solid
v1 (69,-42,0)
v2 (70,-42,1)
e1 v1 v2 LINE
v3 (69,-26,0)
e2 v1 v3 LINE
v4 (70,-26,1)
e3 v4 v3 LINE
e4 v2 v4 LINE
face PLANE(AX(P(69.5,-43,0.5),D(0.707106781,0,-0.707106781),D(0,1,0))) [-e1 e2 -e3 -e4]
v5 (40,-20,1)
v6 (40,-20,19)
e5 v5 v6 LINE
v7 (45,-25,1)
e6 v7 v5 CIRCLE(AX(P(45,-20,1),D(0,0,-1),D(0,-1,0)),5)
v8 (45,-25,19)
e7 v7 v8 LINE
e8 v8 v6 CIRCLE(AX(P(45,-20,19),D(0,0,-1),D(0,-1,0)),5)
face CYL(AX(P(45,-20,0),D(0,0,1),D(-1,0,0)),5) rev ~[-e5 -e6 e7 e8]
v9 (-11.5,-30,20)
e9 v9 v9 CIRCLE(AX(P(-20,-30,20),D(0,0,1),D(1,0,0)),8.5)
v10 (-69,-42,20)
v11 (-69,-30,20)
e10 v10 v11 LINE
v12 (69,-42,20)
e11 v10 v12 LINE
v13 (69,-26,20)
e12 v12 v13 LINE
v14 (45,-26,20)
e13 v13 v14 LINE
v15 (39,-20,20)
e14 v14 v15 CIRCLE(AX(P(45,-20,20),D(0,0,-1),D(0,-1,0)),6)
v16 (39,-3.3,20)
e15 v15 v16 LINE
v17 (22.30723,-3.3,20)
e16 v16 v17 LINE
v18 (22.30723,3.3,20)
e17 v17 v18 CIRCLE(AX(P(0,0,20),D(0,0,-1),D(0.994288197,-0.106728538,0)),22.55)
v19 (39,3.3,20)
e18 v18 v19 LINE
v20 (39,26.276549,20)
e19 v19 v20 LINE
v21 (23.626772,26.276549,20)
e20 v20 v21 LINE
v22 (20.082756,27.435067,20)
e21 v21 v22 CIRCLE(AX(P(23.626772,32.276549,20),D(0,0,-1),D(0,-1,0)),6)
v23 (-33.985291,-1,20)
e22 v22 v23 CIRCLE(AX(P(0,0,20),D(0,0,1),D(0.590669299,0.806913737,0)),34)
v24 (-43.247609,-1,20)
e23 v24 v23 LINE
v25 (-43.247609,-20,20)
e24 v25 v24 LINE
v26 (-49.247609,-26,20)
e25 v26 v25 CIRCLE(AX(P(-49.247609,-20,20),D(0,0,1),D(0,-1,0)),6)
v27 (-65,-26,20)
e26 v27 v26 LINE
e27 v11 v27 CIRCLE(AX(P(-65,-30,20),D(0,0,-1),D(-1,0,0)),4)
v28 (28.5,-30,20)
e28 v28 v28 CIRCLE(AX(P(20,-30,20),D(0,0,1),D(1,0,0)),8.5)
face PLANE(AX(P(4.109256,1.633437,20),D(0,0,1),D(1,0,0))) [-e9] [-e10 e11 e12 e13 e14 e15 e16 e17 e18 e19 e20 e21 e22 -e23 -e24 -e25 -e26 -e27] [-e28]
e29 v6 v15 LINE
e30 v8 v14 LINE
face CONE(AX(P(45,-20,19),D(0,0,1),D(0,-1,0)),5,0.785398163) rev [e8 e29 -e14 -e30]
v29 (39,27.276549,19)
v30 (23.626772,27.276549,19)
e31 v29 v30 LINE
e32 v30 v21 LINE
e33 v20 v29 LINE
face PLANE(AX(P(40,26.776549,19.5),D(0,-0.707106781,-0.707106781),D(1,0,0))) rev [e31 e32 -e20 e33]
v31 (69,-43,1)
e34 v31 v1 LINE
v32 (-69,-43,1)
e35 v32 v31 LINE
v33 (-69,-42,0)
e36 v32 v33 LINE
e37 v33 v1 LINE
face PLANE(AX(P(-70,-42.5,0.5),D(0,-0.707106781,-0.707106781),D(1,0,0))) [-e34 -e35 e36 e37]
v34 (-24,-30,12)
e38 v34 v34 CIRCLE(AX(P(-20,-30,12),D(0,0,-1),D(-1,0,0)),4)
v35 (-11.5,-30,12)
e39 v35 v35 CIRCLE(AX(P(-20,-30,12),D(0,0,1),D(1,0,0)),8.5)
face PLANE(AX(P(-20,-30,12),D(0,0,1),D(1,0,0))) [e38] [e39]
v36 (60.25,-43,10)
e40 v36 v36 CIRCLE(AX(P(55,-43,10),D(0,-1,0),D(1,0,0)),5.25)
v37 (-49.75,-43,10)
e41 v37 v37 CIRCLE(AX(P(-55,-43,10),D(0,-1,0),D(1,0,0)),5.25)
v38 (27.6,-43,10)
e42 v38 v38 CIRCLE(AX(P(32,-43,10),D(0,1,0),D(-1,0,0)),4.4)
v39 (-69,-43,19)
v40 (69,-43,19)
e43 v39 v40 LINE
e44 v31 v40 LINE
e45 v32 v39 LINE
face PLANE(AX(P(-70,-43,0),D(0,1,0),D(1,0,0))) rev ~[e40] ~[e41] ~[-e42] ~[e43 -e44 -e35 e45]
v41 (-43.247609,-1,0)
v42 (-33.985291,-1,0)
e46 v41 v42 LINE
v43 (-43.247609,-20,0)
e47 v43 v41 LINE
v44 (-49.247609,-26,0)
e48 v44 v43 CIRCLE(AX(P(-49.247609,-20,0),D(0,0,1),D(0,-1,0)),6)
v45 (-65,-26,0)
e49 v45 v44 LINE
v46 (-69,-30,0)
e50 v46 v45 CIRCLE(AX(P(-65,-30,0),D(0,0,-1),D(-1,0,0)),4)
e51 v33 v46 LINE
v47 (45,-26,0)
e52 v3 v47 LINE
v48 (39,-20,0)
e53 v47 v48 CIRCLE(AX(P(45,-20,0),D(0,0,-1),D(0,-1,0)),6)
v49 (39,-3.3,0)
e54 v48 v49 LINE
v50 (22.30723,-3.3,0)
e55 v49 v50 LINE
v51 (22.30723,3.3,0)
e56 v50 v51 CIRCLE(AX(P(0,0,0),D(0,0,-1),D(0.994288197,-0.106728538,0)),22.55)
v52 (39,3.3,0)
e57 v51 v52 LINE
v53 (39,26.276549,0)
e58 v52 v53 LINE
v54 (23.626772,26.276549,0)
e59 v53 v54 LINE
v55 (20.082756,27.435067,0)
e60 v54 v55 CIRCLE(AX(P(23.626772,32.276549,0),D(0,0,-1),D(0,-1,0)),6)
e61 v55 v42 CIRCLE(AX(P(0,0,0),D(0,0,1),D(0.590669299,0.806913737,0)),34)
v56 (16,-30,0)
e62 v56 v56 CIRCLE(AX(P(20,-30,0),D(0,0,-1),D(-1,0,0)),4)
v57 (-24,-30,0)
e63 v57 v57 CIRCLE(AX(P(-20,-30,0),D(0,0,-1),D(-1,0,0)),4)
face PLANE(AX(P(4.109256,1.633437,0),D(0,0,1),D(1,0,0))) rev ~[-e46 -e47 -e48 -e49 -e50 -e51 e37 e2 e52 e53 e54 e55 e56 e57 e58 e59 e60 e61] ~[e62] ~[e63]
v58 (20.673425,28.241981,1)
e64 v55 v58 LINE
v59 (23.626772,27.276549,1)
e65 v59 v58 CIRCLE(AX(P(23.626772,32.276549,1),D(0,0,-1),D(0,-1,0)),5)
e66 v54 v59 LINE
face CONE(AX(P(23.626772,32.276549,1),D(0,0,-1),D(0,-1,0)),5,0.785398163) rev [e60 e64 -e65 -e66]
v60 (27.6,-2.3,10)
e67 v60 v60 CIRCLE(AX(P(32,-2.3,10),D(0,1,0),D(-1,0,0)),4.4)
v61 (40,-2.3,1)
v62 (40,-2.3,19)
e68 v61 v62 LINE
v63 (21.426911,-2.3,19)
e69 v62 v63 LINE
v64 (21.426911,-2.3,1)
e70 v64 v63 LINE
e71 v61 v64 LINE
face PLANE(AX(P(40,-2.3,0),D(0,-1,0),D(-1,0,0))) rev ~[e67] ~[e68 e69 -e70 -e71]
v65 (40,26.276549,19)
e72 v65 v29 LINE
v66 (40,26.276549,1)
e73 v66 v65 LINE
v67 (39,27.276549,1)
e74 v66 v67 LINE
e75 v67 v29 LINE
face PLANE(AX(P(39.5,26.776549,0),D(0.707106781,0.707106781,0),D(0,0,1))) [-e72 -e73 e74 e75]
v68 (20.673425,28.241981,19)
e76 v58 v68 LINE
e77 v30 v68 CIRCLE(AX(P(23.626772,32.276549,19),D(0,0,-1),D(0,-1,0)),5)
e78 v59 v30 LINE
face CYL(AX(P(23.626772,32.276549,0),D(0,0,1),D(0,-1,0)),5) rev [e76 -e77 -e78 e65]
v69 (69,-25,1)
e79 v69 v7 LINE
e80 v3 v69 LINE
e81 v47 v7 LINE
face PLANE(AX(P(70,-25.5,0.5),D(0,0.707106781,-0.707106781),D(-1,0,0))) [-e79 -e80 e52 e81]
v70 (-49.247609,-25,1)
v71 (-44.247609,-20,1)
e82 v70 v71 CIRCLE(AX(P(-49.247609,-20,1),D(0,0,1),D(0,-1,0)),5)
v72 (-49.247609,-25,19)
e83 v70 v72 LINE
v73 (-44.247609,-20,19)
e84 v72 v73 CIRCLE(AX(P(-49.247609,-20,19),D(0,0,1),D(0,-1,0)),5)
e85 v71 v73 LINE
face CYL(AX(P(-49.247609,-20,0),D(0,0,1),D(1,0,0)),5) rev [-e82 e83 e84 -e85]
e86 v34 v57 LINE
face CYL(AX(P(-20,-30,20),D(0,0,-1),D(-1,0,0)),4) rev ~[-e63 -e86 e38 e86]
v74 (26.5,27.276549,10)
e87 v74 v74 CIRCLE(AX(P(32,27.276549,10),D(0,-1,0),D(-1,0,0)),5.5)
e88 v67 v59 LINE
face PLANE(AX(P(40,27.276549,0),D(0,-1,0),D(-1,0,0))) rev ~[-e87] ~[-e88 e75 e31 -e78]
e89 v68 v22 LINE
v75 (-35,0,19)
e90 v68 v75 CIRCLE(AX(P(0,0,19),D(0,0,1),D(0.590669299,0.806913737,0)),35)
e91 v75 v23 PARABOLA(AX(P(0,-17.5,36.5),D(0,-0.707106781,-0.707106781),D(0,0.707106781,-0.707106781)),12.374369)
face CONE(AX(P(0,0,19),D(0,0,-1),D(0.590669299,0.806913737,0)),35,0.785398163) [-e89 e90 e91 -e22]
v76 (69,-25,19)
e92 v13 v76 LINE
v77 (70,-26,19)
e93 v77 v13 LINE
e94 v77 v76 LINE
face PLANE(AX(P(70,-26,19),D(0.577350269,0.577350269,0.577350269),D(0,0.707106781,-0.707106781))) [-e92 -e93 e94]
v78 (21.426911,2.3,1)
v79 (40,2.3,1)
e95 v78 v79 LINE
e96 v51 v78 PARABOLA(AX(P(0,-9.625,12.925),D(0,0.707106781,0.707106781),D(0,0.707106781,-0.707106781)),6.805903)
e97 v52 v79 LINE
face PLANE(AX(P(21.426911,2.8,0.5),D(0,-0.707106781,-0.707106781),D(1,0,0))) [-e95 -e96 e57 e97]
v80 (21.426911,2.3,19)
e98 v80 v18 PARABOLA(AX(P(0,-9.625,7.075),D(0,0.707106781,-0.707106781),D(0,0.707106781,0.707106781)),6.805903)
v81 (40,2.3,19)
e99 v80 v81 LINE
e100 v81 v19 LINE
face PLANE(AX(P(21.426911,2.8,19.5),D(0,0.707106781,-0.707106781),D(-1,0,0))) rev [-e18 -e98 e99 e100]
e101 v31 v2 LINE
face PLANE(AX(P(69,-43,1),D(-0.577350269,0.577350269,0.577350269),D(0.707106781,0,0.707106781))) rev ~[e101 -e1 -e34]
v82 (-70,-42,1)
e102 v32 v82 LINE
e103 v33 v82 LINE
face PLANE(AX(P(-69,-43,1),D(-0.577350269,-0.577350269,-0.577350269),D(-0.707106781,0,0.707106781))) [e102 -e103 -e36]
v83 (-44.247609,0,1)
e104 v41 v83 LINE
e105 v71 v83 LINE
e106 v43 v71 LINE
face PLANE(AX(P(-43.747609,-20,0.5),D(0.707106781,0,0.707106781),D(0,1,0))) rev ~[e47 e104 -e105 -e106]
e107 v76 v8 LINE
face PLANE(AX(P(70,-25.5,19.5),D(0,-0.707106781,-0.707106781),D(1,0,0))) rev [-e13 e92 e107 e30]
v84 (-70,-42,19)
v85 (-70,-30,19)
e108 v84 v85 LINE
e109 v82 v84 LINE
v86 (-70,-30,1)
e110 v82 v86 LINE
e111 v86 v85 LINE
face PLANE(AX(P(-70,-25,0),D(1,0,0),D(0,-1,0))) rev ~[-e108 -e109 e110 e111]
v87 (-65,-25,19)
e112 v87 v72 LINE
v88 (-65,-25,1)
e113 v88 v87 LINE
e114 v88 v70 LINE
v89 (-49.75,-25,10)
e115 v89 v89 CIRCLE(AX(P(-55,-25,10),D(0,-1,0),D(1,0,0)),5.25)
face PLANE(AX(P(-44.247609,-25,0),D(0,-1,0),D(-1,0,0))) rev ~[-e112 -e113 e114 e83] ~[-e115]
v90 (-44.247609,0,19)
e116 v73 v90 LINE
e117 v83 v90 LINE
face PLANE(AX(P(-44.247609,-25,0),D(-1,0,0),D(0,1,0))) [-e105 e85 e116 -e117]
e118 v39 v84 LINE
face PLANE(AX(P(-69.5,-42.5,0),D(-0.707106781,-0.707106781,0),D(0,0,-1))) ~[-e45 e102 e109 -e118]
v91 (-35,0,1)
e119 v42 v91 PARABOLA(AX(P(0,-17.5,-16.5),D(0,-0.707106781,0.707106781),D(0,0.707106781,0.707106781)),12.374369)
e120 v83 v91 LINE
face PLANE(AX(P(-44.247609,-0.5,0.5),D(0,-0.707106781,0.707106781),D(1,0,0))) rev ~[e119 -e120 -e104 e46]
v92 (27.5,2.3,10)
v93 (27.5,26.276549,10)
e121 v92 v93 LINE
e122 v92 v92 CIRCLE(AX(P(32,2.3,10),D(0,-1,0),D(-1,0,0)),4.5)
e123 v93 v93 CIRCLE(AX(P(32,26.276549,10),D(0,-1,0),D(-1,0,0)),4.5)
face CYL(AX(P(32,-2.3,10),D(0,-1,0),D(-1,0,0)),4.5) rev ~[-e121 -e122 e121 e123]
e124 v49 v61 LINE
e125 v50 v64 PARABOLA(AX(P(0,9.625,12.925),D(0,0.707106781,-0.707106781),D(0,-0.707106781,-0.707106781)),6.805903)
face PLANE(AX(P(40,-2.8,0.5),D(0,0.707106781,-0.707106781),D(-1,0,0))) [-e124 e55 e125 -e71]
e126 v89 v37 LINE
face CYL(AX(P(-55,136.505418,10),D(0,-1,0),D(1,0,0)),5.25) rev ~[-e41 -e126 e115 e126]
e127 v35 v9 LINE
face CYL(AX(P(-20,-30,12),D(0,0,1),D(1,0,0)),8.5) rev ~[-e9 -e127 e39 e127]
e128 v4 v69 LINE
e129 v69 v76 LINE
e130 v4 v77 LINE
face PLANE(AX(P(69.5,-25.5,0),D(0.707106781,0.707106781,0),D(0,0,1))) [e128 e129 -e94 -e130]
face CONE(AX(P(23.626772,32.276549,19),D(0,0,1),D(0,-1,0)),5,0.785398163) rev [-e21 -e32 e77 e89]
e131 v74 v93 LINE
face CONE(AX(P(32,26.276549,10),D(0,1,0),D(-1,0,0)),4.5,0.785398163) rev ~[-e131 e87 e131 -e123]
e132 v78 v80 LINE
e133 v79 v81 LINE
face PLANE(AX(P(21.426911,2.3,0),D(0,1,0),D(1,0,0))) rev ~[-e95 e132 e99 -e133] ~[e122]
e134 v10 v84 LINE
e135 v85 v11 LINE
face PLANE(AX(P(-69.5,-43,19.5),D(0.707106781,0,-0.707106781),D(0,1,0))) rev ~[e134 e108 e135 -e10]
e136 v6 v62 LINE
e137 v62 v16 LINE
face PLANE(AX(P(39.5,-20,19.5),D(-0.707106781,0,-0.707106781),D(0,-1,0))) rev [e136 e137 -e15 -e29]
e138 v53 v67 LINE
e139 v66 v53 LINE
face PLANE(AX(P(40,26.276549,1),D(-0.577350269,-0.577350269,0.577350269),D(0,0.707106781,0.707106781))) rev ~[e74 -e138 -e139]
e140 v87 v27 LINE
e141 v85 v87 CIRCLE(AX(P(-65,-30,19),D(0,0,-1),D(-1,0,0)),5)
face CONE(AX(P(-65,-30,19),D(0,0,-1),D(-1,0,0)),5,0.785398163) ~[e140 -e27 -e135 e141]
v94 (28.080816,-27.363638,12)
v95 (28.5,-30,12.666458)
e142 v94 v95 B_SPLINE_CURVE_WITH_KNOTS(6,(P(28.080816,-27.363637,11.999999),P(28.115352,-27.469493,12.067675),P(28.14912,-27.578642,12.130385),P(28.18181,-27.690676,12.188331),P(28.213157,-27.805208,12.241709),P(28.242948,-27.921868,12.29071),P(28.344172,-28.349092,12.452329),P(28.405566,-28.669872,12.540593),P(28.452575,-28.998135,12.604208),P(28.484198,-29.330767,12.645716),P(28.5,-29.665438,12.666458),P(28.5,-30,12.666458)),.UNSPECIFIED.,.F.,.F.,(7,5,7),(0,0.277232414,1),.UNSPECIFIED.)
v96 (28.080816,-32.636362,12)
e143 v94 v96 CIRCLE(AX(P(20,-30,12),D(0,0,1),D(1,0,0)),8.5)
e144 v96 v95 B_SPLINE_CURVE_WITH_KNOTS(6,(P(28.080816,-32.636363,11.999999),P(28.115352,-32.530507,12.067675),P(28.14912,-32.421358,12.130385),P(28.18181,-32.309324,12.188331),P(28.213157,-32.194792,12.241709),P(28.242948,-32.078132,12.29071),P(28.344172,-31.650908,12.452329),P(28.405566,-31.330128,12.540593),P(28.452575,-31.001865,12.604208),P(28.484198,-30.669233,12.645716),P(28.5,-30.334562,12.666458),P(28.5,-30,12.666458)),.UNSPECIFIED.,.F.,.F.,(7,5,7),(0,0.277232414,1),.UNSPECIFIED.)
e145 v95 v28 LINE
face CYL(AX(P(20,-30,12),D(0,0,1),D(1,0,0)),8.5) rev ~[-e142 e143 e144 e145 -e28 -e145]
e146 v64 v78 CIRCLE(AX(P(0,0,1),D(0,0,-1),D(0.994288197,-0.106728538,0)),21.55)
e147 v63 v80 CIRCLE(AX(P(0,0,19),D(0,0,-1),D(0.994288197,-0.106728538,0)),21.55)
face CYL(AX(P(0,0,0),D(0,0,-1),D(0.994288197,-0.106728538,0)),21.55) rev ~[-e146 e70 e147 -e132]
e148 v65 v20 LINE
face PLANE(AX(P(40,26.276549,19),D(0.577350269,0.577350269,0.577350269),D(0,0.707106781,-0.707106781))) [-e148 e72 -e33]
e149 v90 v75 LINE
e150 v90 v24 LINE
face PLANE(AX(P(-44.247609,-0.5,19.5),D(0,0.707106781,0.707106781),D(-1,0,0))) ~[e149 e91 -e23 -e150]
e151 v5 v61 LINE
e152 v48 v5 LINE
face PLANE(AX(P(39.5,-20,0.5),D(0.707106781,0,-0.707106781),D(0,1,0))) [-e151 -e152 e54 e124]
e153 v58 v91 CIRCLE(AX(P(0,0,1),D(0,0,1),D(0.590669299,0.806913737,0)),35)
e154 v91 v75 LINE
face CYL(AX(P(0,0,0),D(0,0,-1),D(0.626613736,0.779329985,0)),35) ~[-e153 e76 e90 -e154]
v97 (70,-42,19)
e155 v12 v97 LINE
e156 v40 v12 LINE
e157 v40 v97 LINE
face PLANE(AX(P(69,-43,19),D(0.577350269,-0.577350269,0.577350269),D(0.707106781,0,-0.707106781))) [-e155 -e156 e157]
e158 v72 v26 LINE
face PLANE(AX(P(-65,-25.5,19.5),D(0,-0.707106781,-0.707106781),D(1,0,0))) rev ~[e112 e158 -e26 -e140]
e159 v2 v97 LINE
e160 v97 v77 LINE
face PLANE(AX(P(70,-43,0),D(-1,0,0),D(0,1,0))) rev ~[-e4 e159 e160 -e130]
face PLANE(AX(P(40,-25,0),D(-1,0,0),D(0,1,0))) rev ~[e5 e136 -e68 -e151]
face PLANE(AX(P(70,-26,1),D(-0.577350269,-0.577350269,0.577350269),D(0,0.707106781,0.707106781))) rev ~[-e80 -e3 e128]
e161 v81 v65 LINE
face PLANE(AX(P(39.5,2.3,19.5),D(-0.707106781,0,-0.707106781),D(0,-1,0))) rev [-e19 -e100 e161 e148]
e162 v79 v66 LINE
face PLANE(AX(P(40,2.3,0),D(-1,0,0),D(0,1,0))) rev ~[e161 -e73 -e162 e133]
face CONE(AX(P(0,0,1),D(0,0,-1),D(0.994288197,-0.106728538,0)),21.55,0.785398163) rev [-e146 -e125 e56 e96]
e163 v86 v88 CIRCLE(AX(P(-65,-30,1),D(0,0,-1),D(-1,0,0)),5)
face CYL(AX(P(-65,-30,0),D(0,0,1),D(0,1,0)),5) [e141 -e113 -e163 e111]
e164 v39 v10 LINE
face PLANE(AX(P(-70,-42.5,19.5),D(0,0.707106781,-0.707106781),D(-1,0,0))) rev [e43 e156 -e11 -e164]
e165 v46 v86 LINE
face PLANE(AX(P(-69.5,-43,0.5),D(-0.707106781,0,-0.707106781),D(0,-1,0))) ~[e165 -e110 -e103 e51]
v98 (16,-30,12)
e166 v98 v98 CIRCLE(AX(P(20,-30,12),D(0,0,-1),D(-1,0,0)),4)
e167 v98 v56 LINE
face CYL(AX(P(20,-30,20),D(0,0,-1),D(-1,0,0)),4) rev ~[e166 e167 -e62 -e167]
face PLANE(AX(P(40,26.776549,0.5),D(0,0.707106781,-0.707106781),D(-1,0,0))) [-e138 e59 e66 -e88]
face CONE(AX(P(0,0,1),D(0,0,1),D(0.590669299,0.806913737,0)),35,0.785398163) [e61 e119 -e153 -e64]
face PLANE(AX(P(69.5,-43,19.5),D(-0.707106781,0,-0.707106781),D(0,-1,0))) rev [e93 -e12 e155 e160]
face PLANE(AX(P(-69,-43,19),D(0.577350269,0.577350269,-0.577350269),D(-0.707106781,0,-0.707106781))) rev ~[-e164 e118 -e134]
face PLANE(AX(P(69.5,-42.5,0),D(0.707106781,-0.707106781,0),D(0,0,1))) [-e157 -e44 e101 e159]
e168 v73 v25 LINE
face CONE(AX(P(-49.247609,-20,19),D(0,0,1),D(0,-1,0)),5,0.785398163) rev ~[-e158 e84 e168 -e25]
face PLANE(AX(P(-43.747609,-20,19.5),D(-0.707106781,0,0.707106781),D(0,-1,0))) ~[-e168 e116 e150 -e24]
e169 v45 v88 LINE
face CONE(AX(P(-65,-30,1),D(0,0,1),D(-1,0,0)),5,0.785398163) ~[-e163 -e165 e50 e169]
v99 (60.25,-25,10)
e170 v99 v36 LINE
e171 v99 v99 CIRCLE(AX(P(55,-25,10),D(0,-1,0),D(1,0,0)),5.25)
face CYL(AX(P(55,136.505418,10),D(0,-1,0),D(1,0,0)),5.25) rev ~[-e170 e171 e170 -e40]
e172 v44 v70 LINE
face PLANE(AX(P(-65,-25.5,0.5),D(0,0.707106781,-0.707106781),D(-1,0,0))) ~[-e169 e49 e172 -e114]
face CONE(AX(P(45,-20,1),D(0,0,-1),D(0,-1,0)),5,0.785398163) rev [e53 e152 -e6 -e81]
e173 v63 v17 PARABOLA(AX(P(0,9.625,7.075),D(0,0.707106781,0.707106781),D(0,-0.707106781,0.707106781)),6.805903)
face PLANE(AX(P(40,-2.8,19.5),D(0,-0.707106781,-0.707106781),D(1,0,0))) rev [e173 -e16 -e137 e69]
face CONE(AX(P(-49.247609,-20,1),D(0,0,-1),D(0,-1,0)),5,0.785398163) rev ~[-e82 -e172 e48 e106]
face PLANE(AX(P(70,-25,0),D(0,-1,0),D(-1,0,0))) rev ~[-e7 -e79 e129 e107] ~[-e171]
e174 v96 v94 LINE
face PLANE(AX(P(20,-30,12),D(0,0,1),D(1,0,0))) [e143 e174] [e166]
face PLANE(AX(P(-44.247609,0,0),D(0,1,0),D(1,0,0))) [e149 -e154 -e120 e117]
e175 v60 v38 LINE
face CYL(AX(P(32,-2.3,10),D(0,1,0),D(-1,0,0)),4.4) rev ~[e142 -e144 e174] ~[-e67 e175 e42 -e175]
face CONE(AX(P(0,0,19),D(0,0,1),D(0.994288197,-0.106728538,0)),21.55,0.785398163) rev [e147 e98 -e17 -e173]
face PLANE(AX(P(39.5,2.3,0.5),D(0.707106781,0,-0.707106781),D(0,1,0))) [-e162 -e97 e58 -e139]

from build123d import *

# Parameters (mm, degrees)
F0_W            = 9.2476086318
F0_H            = 25
F1_DEPTH        = 20
F3_D            = 8.8
F3_DEPTH        = 40.701
F4_D            = 9
F4_DEPTH        = 37.301
F6_D            = 10.5
F7_R            = 5
F8_SIZE         = 1
F10_D           = 8
F10_CBORE_D     = 17
F10_CBORE_DEPTH = 8


# Not quite as in the source:
# - a feature names something its author has since deleted; it is built from what else it names


with BuildPart() as f1:
    # F0 (on Top) → F1 (new body)
    with BuildSketch(Plane.XY):
        with BuildLine():
            ThreePointArc((21.4269106499, -2.3), (-21.55, 0), (21.4269106499, 2.3))
            Line((21.4269106499, 2.3), (40, 2.3))
            Line((40, 2.3), (40, 27.2765494883))
            Line((40, 27.2765494883), (21.9314807528, 27.2765494883))
            ThreePointArc((21.9314807528, 27.2765494883), (-15.122800231, 31.5642347155), (-35, 0))
            ThreePointArc((-35, 0), (-1.1506219411, -34.9810815892), (34.9243468085, -2.3))
            Line((34.9243468085, -2.3), (21.4269106499, -2.3))
        make_face()
        with BuildLine():
            Line((40, -2.3), (34.9243468085, -2.3))
            ThreePointArc((34.9243468085, -2.3), (-1.1506219411, -34.9810815892), (-35, 0))
            Line((-35, 0), (-35, -25))
            Line((-35, -25), (-44.2476086318, -25))
            Line((-44.2476086318, -25), (-70, -25))
            Line((-70, -25), (-70, -43))
            Line((-70, -43), (70, -43))
            Line((70, -43), (70, -25))
            Line((70, -25), (40, -25))
            Line((40, -25), (40, -2.3))
        make_face()
        with Locations((-39.6238043159, -12.5)):
            Rectangle(F0_W, F0_H)
    extrude(amount=F1_DEPTH)

    # F3 (through all, one way)
    with BuildSketch(Plane(origin=(0, -2.3, 0), x_dir=(-1, 0, 0), z_dir=(0, 1, 0))):
        with Locations((-32, 10)):
            Circle(F3_D / 2)
    extrude(amount=-F3_DEPTH, mode=Mode.SUBTRACT)

    # F4 (through all, one way)
    with BuildSketch(Plane(origin=(0, -2.3, 0), x_dir=(-1, 0, 0), z_dir=(0, -1, 0))):
        with Locations((-32, -10)):
            Circle(F4_D / 2)
    extrude(amount=-F4_DEPTH, mode=Mode.SUBTRACT)

    # F6 (through all)
    with Locations(Plane(origin=(0, -25, 0), x_dir=(-1, 0, 0), z_dir=(0, 1, 0))):
        with Locations((55, 10), (-55, 10)):
            Hole(F6_D / 2)

    # F7
    f7_edges = [f1.edges().sort_by_distance(p)[0] for p in [
        (40, -25, 10),
        (21.931481, 27.276549, 10),
        (-44.247609, -25, 10),
        (-70, -25, 10),
    ]]
    fillet(f7_edges, radius=F7_R)

    # F8
    f8_edges = [f1.edges().sort_by_distance(p)[0] for p in [
        (31.813386, 27.276549, 20),
        (22.073202, 27.524032, 20),
        (40, 14.788275, 20),
        (-15.833984, 31.213538, 20),
        (30.713455, 2.3, 20),
        (-39.623804, 0, 20),
        (-21.55, 0, 20),
        (-44.247609, -10, 20),
        (30.713455, -2.3, 20),
        (-45.712075, -23.535534, 20),
        (40, -11.15, 20),
        (-57.123804, -25, 20),
        (41.464466, -23.535534, 20),
        (-68.535534, -26.464466, 20),
        (57.5, -25, 20),
        (-70, -36.5, 20),
        (70, -34, 20),
        (0, -43, 20),
        (31.813386, 27.276549, 0),
        (22.073202, 27.524032, 0),
        (40, 14.788275, 0),
        (-15.833984, 31.213538, 0),
        (30.713455, 2.3, 0),
        (-39.623804, 0, 0),
        (-21.55, 0, 0),
        (-44.247609, -10, 0),
        (30.713455, -2.3, 0),
        (-45.712075, -23.535534, 0),
        (40, -11.15, 0),
        (-57.123804, -25, 0),
        (41.464466, -23.535534, 0),
        (-68.535534, -26.464466, 0),
        (57.5, -25, 0),
        (-70, -36.5, 0),
        (70, -34, 0),
        (0, -43, 0),
        (23.626772, 27.276549, 10),
        (40, 27.276549, 10),
        (36.5, 27.276549, 10),
        (-70, -30, 10),
        (-70, -43, 10),
        (70, -43, 10),
        (70, -25, 10),
    ]]
    chamfer(f8_edges, length=F8_SIZE)

    # F10 (through all)
    with Locations(Plane.XY.offset(20)):
        with Locations((-20, -30), (20, -30)):
            CounterBoreHole(F10_D / 2, F10_CBORE_D / 2, F10_CBORE_DEPTH)


solid = f1.part
